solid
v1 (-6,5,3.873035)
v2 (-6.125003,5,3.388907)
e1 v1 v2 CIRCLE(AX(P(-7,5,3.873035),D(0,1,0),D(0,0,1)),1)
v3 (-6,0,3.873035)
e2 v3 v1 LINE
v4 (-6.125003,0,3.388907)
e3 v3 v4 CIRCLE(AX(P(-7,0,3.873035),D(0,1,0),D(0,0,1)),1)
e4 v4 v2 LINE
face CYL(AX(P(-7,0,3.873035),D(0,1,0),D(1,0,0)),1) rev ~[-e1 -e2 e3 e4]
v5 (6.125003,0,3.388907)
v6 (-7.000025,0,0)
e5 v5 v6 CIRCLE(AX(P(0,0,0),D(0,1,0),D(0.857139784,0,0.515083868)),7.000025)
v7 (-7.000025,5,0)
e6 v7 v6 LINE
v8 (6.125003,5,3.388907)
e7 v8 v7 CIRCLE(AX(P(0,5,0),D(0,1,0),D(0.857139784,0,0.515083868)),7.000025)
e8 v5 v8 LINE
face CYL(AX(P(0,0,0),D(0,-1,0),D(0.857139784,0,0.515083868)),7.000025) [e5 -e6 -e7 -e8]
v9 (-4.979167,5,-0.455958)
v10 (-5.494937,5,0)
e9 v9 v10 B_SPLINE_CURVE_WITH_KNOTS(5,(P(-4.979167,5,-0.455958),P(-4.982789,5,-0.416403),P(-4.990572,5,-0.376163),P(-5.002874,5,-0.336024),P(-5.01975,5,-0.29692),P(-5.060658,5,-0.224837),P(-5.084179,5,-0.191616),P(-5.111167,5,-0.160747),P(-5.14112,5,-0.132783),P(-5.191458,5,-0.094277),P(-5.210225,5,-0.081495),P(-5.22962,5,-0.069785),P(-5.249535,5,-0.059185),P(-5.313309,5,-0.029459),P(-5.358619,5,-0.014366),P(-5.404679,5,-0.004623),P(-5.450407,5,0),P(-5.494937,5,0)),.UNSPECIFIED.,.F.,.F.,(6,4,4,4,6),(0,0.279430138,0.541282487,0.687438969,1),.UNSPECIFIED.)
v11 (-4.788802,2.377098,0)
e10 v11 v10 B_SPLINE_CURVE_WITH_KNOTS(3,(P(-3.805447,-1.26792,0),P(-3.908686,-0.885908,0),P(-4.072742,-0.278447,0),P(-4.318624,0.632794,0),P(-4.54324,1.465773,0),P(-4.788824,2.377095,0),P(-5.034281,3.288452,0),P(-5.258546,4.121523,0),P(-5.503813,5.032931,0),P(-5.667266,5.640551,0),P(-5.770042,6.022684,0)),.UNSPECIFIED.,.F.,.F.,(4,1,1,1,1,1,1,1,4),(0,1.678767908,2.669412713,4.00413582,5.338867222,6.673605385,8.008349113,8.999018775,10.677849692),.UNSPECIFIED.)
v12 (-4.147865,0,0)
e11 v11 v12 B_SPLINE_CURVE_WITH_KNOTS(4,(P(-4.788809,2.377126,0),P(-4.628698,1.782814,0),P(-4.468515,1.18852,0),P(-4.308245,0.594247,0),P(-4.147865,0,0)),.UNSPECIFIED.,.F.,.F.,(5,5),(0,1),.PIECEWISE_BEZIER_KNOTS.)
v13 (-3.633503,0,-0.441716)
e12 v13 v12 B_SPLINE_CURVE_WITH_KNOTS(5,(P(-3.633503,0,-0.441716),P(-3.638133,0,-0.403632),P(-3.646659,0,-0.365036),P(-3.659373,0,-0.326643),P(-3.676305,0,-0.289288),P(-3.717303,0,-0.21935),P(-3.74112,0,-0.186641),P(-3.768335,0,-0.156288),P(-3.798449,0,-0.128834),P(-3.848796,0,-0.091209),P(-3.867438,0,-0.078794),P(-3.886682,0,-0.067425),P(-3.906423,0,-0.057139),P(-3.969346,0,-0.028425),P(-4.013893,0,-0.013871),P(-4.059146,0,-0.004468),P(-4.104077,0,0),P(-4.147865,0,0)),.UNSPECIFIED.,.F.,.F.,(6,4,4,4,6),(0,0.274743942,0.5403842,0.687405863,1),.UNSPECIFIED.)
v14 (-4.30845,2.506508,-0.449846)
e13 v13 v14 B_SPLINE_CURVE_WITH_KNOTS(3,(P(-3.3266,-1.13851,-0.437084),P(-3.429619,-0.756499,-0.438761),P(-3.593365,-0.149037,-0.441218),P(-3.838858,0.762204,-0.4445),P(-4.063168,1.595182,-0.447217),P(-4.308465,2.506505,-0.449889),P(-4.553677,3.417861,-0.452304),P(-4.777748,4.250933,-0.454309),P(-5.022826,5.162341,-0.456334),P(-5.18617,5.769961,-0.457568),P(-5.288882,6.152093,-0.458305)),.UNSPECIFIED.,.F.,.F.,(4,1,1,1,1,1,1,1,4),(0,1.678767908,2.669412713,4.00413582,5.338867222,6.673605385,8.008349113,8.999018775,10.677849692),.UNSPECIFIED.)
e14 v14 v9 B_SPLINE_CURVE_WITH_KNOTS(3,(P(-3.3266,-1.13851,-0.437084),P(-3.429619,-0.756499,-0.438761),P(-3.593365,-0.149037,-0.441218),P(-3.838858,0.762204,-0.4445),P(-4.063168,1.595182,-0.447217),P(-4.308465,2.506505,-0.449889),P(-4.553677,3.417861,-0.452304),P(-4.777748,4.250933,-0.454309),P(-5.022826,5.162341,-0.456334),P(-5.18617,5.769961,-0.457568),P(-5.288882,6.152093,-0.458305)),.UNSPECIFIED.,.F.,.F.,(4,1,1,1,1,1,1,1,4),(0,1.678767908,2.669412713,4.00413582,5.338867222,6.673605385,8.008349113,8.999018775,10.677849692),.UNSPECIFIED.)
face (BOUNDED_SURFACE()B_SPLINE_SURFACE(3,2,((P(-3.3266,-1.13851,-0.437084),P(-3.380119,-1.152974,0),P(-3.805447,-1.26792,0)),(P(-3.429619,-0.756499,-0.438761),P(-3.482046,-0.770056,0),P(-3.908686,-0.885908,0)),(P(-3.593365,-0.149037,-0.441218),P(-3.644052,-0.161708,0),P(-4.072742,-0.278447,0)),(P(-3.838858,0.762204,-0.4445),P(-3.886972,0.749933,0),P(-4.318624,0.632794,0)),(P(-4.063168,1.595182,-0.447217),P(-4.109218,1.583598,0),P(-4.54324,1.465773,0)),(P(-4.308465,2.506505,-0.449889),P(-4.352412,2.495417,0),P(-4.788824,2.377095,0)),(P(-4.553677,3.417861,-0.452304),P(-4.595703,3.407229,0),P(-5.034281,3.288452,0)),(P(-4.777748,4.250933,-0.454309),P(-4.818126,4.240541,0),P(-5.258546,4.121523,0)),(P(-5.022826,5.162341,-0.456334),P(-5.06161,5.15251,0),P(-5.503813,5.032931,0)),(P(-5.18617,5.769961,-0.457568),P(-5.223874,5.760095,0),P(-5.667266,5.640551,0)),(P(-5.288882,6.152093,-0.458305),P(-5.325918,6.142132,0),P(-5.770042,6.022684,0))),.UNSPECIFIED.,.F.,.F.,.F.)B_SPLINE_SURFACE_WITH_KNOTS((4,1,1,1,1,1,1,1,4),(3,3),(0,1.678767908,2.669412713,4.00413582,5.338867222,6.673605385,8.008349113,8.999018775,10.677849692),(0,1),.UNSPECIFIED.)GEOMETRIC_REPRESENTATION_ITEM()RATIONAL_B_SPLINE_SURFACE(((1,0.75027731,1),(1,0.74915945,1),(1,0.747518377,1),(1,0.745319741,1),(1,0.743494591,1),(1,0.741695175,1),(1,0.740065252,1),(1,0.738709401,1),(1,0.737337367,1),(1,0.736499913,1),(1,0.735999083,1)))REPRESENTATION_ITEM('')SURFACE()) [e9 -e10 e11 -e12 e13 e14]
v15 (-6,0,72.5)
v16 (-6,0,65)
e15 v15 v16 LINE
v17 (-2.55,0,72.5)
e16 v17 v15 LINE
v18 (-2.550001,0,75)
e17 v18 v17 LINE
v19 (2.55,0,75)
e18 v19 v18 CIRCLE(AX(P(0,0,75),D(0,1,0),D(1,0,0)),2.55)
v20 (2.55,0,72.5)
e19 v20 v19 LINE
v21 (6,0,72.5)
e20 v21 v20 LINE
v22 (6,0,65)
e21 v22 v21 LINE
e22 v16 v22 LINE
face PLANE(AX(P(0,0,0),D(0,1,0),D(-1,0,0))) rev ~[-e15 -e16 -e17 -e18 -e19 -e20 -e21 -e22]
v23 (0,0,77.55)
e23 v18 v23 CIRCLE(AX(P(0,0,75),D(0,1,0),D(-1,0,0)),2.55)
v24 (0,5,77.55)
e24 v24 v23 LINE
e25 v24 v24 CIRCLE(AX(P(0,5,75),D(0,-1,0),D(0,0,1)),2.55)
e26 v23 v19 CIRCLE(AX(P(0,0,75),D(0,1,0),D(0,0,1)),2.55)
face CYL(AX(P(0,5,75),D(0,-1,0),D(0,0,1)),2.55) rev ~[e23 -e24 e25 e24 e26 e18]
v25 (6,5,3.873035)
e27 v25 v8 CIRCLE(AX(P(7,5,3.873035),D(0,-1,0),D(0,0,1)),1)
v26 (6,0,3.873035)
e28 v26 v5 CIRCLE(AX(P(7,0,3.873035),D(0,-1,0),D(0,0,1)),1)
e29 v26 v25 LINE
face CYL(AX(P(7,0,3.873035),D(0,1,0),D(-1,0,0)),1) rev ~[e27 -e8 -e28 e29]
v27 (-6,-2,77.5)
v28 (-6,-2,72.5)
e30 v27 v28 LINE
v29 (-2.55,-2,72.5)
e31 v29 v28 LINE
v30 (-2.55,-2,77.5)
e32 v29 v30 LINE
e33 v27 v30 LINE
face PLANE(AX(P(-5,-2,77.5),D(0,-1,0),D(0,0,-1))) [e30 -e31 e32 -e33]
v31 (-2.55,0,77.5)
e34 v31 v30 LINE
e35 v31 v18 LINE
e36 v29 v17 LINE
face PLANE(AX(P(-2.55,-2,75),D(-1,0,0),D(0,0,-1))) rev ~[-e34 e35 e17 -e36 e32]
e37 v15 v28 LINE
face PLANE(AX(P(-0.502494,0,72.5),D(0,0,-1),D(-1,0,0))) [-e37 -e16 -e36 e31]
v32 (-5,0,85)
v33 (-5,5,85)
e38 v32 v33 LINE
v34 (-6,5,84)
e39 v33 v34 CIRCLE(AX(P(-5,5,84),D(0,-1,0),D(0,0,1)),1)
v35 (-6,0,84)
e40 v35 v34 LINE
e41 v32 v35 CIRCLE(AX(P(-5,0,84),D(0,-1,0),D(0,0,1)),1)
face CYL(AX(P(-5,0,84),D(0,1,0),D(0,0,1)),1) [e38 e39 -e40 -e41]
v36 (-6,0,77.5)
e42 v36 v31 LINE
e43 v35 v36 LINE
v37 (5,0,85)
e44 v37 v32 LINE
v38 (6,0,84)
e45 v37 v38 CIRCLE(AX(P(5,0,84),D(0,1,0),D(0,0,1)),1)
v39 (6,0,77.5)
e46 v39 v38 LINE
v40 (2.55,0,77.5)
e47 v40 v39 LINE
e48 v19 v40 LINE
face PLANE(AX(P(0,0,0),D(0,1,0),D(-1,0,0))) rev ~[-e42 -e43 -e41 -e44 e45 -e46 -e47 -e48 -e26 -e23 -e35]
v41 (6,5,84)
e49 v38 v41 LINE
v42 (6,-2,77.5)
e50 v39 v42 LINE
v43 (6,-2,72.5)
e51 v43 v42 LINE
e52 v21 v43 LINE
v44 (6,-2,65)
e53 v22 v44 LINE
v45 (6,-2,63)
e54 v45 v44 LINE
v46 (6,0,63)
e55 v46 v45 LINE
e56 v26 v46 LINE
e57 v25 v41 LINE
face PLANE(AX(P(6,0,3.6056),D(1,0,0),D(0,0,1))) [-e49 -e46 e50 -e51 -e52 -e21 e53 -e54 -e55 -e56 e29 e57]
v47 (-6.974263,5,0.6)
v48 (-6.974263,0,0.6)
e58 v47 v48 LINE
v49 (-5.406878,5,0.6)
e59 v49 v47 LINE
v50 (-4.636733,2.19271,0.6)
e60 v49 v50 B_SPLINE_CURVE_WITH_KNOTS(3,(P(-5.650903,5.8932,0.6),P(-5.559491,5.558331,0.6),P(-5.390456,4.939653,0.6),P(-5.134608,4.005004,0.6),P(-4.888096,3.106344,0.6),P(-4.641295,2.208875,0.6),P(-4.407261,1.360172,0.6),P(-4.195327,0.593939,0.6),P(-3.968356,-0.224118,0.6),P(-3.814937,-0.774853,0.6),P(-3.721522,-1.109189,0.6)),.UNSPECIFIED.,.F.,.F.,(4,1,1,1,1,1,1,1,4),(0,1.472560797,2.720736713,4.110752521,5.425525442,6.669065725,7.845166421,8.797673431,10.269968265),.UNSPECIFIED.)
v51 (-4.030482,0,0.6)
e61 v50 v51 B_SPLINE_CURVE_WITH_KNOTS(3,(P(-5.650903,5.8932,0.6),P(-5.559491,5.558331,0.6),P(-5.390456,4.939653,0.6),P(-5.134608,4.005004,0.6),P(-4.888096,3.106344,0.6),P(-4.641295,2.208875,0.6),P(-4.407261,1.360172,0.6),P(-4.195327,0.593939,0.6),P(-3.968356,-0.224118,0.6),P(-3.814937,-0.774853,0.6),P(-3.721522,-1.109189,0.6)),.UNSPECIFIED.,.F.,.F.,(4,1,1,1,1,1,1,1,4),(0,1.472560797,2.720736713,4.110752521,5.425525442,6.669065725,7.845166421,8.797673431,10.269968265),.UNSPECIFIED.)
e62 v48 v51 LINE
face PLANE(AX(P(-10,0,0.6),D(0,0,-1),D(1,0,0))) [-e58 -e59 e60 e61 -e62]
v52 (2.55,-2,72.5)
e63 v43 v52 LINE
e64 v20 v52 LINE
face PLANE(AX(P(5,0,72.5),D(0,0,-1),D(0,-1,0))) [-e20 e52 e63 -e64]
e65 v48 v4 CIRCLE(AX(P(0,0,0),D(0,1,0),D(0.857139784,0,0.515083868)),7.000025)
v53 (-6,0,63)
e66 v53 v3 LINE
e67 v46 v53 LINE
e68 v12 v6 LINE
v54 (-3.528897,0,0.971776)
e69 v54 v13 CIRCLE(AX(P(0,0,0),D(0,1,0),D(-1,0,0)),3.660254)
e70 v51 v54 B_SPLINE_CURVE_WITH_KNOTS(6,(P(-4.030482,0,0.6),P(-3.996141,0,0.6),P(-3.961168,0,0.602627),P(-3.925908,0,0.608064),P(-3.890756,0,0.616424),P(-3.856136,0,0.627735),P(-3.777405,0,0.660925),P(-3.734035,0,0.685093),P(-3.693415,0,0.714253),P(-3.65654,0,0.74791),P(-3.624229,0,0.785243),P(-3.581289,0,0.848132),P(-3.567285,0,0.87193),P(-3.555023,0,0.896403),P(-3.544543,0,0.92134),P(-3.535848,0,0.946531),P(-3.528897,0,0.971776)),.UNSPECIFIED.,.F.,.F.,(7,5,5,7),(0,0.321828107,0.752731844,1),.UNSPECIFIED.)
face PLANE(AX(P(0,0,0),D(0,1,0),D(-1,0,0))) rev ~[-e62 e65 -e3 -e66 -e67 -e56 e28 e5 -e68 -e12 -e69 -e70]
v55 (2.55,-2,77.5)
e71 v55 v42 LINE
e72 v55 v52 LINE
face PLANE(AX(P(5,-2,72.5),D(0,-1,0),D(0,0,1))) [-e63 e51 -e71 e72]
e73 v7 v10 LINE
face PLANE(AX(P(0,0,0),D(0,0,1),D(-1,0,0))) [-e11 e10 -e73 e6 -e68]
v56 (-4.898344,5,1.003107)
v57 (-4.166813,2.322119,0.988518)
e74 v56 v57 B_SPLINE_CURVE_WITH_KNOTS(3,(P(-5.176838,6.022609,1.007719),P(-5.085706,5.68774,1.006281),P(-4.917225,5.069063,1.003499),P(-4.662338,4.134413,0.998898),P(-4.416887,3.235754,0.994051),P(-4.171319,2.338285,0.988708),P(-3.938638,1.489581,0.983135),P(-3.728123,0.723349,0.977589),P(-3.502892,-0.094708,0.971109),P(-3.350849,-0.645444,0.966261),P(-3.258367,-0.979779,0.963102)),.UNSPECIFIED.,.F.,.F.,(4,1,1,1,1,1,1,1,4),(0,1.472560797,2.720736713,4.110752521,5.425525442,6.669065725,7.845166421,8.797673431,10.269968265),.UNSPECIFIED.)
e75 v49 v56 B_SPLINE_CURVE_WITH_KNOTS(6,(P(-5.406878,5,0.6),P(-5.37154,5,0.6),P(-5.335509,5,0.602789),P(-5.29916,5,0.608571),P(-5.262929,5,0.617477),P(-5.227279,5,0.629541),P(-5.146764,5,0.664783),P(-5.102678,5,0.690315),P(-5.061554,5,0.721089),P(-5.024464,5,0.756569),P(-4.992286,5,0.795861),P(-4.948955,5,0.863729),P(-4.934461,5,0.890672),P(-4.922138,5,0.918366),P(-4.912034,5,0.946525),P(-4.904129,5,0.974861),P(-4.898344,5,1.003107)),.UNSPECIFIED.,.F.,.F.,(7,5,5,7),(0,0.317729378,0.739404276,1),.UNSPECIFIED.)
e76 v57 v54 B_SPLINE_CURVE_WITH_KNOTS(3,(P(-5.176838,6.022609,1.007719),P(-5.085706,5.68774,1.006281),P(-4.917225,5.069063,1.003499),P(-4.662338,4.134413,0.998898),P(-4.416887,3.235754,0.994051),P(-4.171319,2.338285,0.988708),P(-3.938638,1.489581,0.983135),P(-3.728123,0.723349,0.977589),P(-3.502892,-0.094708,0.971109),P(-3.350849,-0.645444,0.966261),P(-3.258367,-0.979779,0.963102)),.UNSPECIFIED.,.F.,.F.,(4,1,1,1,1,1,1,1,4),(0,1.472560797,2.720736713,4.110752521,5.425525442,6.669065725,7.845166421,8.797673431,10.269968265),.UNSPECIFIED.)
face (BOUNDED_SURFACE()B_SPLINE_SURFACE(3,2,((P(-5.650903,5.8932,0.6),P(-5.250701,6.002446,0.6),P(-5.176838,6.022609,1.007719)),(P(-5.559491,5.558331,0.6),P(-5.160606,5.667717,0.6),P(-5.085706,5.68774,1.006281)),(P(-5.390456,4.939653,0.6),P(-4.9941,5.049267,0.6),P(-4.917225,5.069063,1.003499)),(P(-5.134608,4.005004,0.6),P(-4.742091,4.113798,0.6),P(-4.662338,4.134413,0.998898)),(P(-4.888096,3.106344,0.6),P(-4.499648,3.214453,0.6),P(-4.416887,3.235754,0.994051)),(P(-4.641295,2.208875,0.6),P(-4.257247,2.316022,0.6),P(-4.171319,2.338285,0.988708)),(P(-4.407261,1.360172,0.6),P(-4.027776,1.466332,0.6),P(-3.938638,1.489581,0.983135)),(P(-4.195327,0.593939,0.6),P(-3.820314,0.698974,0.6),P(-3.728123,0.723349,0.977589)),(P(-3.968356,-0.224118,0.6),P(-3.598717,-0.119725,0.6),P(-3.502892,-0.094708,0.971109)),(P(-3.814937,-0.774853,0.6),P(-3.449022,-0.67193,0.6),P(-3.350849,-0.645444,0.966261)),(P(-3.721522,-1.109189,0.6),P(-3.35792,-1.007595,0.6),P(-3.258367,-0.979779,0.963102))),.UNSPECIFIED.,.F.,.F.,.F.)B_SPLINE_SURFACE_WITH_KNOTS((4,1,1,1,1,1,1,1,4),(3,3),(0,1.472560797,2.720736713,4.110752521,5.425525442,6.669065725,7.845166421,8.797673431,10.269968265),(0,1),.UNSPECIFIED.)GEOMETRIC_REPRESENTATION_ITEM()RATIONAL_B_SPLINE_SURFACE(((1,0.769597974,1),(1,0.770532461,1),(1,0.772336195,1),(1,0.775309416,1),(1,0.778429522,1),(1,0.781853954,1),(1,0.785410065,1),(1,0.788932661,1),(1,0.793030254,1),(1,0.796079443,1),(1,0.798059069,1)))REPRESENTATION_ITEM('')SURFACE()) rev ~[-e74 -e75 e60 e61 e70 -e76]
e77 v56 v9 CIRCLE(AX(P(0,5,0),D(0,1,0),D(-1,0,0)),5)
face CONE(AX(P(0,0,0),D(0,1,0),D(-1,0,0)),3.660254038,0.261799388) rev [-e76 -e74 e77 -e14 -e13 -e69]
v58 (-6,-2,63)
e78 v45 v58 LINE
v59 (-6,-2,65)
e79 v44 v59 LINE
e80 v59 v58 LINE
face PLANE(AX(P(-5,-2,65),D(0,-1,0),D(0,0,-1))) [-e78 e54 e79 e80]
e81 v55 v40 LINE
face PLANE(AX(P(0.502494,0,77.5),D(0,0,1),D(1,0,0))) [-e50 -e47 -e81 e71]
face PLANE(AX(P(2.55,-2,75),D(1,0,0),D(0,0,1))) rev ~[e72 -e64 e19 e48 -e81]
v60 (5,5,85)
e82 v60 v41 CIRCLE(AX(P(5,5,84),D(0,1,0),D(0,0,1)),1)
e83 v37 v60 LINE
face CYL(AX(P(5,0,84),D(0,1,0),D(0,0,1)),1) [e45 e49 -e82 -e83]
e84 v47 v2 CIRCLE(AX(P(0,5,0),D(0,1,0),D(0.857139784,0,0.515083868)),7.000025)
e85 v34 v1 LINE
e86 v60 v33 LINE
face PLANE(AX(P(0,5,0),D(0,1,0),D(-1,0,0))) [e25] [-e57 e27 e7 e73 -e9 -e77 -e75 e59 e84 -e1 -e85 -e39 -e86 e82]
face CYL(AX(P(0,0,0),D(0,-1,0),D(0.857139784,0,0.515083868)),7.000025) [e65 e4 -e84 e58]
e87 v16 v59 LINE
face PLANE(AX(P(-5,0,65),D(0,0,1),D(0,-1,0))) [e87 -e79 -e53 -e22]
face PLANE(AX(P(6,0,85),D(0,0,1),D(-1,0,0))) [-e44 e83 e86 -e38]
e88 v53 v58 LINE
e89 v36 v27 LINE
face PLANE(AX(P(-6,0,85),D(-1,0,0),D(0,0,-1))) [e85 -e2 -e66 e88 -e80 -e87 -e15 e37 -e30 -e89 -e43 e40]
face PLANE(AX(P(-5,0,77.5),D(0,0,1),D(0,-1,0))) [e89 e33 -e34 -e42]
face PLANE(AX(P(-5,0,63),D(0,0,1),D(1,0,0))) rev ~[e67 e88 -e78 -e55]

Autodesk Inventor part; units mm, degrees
ref_plane "YZ Plane" through (0, 0, 0) normal (1, 0, 0) x (0, 1, 0)
ref_plane "XZ Plane" through (0, 0, 0) normal (0, 1, 0) x (-1, 0, 0)
ref_plane "XY Plane" through (0, 0, 0) normal (0, 0, 1) x (1, 0, 0)
sketch "Sketch1" plane through (0, 0, 0) normal (0, 1, 0) x (-1, 0, 0)
  circle A0 centre (0, 0) radius 5
  line L0 (-6, 85) -> (6, 85)
  arc A1 (-6, 3.6056) -> (6, 3.6056) centre (0, 0) ccw
  line L1 (-6, 3.6056) -> (-6, 85)
  line L2 (6, 85) -> (6, 3.6056)
  point P0 (-6, 0)
  point P1 (-5, 85)
  point P2 (5, 85)
extrude "Extrusion1" add sketch "Sketch1" along normal blind 5
sketch "Sketch2" plane through (0, 5, 0) normal (0, 1, 0) x (1, 0, 0)
  line L0 (-6, -85) -> (6, -85) construction
  line L1 (0, -85) -> (0, -75) construction
  point P0 (0, 0)
  point P1 (-5, -85)
  point P2 (5, -85)
  dimension "d5" = 10
hole "Hole1" at (0, 5, 75) direction (0, -1, 0) diameter 5.1 end through all
draft "FaceDraft1" angle 15 pull direction (0, 1, 0) faces at (-4.9353, 3.3333, -0.8021) fixed edges at (5, 5, 0)
sketch "Sketch3" plane through (0, 0, 0) normal (0, -1, 0) x (1, 0, 0)
  line L0 (0, 0) -> (-10, 0)
  line L1 (-10, 0) -> (-10, 0.6)
  line L2 (-10, 0.6) -> (0, 0.6)
  line L3 (0, 0.6) -> (0, 0)
  dimension "d15" = 0.6
  dimension "d19" = 10
extrude "Extrusion2" cut sketch "Sketch3" against normal blind 10
fillet "Fillet2" radius 0.5 2 edges at (-4.2347, 2.3015, 0.6) (-4.3301, 2.5, 0)
sketch "Sketch4" plane through (0, 0, 0) normal (0, -1, 0) x (1, 0, 0)
  line L0 (6, 85) -> (-6, 85) construction
  line L1 (0, 85) -> (0, 65) construction
  line L2 (5, 84) -> (5, 4.3589) projected
  line L3 (-5, 4.3589) -> (-5, 84) projected
  line L4 (5, 65) -> (-5, 65)
  line L5 (-5, 65) -> (-5, 63)
  line L6 (-5, 63) -> (5, 63)
  line L7 (5, 63) -> (5, 65)
  line L8 (-5, 77.5) -> (5, 77.5)
  line L9 (5, 77.5) -> (5, 72.5)
  line L10 (5, 72.5) -> (-5, 72.5)
  line L11 (-5, 72.5) -> (-5, 77.5)
  line L12 (-5, 77.5) -> (5, 72.5) construction
  line L13 (5, 77.5) -> (-5, 72.5) construction
  circle A0 centre (0, 75) radius 2.55 projected
  point P0 (0, 0)
  point P1 (4, 85)
  point P2 (-4, 85)
  dimension "d21" = 20
  dimension "d22" = 2
  dimension "d23" = 5
extrude "Extrusion3" add sketch "Sketch4" along normal blind 2 contours L2 L10 A0 L8 | L2 L6 L3 L4 | A0 L10 L3 L8
sketch "Sketch5" plane through (0, -2, 0) normal (0, -1, 0) x (1, 0, 0)
  arc A0 (0.5025, 72.5) -> (0.5025, 77.5) centre (0, 75) ccw projected
  circle A1 centre (0, 75) radius 2.55 projected
  line L0 (2.55, 77.55) -> (-2.55, 77.55)
  line L1 (-2.55, 77.55) -> (-2.55, 72.45)
  line L2 (-2.55, 72.45) -> (2.55, 72.45)
  line L3 (2.55, 72.45) -> (2.55, 77.55)
  line L4 (2.55, 77.55) -> (-2.55, 72.45) construction
  line L5 (-2.55, 77.55) -> (2.55, 72.45) construction
  arc A2 (-0.5025, 72.5) -> (0.5025, 72.5) centre (0, 75) ccw projected
  arc A3 (0.5025, 77.5) -> (-0.5025, 77.5) centre (0, 75) ccw projected
  arc A4 (-0.5025, 77.5) -> (-0.5025, 72.5) centre (0, 75) ccw projected
  point P0 (0, 0)
  dimension "d26" = 5.1
  dimension "d27" = 5.1
extrude "Extrusion4" cut sketch "Sketch5" against normal blind 2 contours A0 L3 L2 A1 | A0 A1 L0 L3 | L2 L1 A1 | A1 L1 L0
sketch "Sketch6" plane through (-5, 0, 72.5) normal (-1, 0, 0) x (0, 0, 1)
  line L0 (0, 0) -> (5, 0) projected
  line L1 (0, 0) -> (0, -2) projected
  line L2 (5, -2) -> (0, -2) projected
  line L3 (5, 0) -> (5, -2) projected
  line L4 (-9.5, 0) -> (-7.5, 0) projected
  line L5 (-9.5, 0) -> (-9.5, -2) projected
  line L6 (-7.5, -2) -> (-9.5, -2) projected
  line L7 (-7.5, 0) -> (-7.5, -2) projected
  point P0 (-72.5, 0)
extrude "Extrusion5" add sketch "Sketch6" along normal blind 1
sketch "Sketch7" plane through (5, 0, 77.5) normal (1, 0, 0) x (0, 0, -1)
  line L0 (0, 0) -> (5, 0) projected
  line L1 (0, 0) -> (0, -2) projected
  line L2 (5, -2) -> (0, -2) projected
  line L3 (5, 0) -> (5, -2) projected
  line L4 (12.5, 0) -> (14.5, 0) projected
  line L5 (12.5, 0) -> (12.5, -2) projected
  line L6 (14.5, -2) -> (12.5, -2) projected
  line L7 (14.5, 0) -> (14.5, -2) projected
  point P0 (77.5, 0)
extrude "Extrusion6" add sketch "Sketch7" along normal blind 1
fillet "Fillet4" radius 1 4 edges at (6, 2.5, 85) (-6, 2.5, 85) (6, 2.5, 3.6056) (-6, 2.5, 3.6056)
properties part number "filament guide"
